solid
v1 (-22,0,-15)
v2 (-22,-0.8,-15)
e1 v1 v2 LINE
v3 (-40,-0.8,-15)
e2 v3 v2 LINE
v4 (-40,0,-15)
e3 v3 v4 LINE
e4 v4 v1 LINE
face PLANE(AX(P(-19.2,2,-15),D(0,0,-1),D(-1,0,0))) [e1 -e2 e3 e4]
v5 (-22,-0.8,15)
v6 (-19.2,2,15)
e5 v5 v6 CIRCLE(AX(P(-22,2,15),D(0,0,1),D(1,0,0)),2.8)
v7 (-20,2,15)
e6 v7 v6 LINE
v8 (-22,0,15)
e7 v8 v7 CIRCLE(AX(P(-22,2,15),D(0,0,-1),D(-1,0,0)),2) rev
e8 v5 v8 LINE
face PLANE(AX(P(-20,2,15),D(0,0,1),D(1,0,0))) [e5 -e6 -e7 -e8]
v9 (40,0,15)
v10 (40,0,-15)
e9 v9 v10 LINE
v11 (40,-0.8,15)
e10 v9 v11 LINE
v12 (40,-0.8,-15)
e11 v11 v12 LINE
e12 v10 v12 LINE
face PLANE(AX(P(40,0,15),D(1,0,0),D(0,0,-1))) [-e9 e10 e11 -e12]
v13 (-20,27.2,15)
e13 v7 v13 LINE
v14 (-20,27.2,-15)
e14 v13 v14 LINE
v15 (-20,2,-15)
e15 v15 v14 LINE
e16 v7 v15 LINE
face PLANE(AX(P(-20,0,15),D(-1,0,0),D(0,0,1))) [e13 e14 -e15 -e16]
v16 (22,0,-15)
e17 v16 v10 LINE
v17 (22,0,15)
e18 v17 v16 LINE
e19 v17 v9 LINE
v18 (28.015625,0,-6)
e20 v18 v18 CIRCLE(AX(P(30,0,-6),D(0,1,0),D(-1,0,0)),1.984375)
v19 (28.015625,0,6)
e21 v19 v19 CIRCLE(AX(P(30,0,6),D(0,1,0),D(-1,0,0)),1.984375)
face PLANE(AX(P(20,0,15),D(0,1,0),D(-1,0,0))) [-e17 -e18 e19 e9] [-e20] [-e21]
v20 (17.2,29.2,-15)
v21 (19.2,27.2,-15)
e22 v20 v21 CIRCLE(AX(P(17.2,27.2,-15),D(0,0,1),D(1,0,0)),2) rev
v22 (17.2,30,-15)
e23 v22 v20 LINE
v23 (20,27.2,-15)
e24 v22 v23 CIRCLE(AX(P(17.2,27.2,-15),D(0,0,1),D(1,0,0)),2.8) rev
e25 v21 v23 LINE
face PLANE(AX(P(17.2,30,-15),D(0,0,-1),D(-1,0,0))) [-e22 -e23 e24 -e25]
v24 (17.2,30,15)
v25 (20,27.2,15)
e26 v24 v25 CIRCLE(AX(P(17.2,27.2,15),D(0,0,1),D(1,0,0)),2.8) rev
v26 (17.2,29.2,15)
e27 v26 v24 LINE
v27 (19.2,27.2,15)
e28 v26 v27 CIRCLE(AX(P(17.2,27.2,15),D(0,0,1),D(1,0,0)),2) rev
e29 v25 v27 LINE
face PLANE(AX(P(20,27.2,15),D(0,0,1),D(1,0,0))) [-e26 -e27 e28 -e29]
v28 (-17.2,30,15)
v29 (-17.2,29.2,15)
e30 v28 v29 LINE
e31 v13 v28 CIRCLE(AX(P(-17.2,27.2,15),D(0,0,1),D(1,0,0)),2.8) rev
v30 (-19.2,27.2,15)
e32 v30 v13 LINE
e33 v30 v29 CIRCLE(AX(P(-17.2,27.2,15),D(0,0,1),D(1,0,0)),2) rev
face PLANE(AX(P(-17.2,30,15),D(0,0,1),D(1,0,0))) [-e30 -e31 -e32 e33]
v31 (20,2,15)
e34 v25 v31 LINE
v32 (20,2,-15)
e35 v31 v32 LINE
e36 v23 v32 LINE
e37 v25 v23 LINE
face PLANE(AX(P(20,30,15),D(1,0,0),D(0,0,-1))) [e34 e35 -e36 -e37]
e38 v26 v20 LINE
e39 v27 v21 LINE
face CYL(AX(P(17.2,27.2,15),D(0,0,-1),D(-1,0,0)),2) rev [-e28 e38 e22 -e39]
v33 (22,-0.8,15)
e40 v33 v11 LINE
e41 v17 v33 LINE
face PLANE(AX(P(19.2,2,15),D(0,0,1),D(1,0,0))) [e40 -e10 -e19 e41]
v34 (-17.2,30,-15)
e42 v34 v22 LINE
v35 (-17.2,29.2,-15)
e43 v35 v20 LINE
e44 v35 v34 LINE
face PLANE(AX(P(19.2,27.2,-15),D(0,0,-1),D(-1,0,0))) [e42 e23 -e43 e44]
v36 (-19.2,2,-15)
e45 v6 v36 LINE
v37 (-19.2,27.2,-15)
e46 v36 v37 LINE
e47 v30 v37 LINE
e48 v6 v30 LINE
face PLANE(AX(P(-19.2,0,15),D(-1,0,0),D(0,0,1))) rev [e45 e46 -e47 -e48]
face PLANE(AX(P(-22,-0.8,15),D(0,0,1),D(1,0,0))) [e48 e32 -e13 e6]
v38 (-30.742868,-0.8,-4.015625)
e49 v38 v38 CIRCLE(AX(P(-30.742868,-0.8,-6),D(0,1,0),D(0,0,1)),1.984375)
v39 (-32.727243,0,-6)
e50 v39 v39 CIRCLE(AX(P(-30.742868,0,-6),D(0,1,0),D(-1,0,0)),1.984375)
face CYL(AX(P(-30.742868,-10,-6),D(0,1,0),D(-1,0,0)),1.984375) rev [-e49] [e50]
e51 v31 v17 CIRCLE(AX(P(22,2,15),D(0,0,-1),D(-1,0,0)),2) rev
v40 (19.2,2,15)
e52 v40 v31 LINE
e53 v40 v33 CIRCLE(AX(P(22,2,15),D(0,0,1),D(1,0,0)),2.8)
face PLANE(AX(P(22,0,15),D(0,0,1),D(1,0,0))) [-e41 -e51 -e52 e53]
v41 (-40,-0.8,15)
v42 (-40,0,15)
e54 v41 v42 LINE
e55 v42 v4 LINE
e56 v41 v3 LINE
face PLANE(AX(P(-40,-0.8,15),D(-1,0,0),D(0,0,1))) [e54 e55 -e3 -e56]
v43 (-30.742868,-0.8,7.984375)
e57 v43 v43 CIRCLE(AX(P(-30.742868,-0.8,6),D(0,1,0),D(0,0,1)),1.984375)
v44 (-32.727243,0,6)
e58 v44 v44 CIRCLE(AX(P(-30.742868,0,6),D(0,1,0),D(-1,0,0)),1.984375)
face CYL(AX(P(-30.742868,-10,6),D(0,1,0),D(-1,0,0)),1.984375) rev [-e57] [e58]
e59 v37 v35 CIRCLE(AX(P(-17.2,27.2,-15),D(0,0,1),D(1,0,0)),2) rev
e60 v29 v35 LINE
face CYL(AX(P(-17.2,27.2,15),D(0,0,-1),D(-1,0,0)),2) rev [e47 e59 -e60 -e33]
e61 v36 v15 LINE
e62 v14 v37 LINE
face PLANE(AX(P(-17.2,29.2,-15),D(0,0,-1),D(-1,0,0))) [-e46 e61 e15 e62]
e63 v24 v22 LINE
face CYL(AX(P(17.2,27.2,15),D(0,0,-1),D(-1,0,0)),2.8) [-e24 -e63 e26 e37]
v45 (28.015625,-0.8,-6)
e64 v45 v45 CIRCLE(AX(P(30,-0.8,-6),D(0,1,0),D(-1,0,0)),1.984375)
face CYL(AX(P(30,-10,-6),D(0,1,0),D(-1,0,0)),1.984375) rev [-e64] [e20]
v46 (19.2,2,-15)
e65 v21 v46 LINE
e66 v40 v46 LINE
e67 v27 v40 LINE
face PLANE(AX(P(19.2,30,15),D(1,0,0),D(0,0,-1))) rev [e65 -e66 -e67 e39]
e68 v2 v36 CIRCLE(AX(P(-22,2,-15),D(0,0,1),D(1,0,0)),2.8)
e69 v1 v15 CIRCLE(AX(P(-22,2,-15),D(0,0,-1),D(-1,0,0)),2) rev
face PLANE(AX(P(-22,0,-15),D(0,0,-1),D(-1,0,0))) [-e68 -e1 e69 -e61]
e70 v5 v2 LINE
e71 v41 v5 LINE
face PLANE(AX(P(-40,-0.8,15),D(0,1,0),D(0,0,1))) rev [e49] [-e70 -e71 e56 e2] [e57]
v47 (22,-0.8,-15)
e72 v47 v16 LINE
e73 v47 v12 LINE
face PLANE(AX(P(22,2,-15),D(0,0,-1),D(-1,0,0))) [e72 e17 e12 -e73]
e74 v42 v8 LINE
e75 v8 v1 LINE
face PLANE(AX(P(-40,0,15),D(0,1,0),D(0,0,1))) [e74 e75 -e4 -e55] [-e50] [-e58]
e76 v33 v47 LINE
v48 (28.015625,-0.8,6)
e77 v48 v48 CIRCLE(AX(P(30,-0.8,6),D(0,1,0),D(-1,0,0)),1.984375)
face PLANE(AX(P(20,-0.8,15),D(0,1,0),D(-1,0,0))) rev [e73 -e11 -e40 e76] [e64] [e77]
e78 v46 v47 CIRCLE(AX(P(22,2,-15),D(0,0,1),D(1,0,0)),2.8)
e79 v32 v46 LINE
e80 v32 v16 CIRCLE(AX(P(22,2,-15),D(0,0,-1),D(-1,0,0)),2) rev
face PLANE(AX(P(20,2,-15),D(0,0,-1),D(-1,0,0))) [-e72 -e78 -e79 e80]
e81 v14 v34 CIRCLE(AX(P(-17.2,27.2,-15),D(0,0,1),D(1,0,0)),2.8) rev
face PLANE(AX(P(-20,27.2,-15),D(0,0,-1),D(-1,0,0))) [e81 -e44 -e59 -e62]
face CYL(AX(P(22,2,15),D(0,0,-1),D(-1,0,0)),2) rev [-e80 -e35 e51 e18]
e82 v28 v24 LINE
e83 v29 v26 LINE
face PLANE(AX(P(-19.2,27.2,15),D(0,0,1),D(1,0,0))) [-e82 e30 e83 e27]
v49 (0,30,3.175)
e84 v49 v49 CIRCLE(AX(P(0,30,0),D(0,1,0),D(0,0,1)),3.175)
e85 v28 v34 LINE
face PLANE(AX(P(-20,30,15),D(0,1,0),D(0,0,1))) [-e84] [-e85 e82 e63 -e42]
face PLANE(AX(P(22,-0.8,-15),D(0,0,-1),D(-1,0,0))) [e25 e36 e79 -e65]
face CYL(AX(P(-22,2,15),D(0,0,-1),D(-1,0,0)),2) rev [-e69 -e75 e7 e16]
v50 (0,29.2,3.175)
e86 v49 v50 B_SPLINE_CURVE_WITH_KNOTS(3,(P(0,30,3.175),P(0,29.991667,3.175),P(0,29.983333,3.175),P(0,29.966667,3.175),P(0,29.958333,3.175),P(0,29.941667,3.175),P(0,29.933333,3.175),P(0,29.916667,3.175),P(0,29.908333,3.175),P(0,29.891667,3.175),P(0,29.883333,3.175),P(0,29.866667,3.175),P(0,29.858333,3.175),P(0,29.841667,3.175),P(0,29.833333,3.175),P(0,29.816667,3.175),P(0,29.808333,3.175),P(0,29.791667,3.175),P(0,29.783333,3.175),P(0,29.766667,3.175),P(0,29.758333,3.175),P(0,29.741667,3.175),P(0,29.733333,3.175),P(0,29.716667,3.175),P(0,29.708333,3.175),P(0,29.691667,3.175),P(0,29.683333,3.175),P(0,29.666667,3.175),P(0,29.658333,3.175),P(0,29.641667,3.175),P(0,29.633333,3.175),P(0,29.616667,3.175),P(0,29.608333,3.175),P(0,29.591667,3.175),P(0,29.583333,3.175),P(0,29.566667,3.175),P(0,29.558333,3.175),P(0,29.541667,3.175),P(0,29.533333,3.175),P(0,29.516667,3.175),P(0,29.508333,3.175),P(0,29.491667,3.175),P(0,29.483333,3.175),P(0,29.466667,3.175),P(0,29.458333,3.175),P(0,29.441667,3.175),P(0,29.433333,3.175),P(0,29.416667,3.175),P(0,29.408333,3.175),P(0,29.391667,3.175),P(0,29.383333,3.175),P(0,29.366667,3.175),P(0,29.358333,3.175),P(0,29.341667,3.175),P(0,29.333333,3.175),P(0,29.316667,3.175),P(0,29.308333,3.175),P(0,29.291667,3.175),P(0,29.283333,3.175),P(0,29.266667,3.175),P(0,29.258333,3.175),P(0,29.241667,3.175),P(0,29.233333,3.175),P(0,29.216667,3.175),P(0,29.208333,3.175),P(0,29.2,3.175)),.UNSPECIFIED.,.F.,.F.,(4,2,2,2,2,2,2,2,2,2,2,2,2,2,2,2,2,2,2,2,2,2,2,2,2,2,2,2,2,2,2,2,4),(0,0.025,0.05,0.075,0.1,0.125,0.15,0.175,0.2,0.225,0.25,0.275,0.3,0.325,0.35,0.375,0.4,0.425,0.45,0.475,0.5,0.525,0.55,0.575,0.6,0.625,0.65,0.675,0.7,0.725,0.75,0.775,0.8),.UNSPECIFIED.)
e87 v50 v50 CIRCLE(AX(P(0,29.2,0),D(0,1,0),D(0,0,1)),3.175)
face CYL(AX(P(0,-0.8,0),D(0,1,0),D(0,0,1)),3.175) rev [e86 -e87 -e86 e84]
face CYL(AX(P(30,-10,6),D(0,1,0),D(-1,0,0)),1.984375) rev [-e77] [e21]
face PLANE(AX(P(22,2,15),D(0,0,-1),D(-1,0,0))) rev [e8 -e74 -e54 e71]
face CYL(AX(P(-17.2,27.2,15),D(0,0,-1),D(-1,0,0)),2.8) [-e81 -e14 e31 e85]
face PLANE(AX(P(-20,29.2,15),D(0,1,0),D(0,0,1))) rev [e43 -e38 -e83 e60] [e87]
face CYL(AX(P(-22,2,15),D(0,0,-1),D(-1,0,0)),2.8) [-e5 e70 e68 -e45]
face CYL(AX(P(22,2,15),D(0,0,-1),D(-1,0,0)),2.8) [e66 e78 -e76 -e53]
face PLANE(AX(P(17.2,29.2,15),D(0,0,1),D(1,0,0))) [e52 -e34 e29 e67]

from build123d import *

# Parameters (mm, degrees)
BASE_FLANGE1_DEPTH      = 15
BASE_FLANGE1_DEPTH_BACK = 15
SKETCH6_R               = 3.175
CUT_EXTRUDE1_DEPTH      = 53.665358634
SKETCH7_R               = 1.984375
CUT_EXTRUDE2_DEPTH      = 10


# Sheet-metal steps are written as plain solids
with BuildPart() as part:
    # Sketch1 → Base-Flange1 (new, two sides: drawn at the far end of the back side and taken through both)
    with BuildSketch(Plane.XY.offset(-BASE_FLANGE1_DEPTH_BACK)):
        with BuildLine():
            Line((-40, 0), (-22, 0))
            ThreePointArc((-22, 0), (-20.585786438, 0.585786438), (-20, 2))
            Line((-20, 2), (-20, 27.2))
            ThreePointArc((-20, 27.2), (-19.179898987, 29.179898987), (-17.2, 30))
            Line((-17.2, 30), (17.2, 30))
            ThreePointArc((17.2, 30), (19.179898987, 29.179898987), (20, 27.2))
            Line((20, 27.2), (20, 2))
            ThreePointArc((20, 2), (20.585786438, 0.585786438), (22, 0))
            Line((22, 0), (40, 0))
            Line((40, 0), (40, -0.8))
            Line((40, -0.8), (22, -0.8))
            ThreePointArc((22, -0.8), (20.020101013, 0.020101013), (19.2, 2))
            Line((19.2, 2), (19.2, 27.2))
            ThreePointArc((19.2, 27.2), (18.614213562, 28.614213562), (17.2, 29.2))
            Line((17.2, 29.2), (-17.2, 29.2))
            ThreePointArc((-17.2, 29.2), (-18.614213562, 28.614213562), (-19.2, 27.2))
            Line((-19.2, 27.2), (-19.2, 2))
            ThreePointArc((-19.2, 2), (-20.020101013, 0.020101013), (-22, -0.8))
            Line((-22, -0.8), (-40, -0.8))
            Line((-40, -0.8), (-40, 0))
        make_face()
    extrude(amount=BASE_FLANGE1_DEPTH + BASE_FLANGE1_DEPTH_BACK)

    # Sketch6 → Cut-Extrude1 (cut, through all)
    with BuildSketch(Plane(origin=(0, 30, 0), x_dir=(1, 0, 0), z_dir=(0, 1, 0))):
        with Locations(Location((0, 0, 0), (0, 0, 270))):
            Circle(SKETCH6_R)
    extrude(amount=-CUT_EXTRUDE1_DEPTH, mode=Mode.SUBTRACT)

    # Sketch7 → Cut-Extrude2 (cut)
    with BuildSketch(Plane(origin=(0, 0, 0), x_dir=(1, 0, 0), z_dir=(0, 1, 0))):
        with Locations(Location((30, -6, 0), (0, 0, 180))):
            Circle(SKETCH7_R)
        with Locations(Location((30, 6, 0), (0, 0, 180))):
            Circle(SKETCH7_R)
        with Locations(Location((-30.742868113, 6, 0), (0, 0, 180))):
            Circle(SKETCH7_R)
        with Locations(Location((-30.742868113, -6, 0), (0, 0, 180))):
            Circle(SKETCH7_R)
    extrude(amount=-CUT_EXTRUDE2_DEPTH, mode=Mode.SUBTRACT)


solid = part.part
